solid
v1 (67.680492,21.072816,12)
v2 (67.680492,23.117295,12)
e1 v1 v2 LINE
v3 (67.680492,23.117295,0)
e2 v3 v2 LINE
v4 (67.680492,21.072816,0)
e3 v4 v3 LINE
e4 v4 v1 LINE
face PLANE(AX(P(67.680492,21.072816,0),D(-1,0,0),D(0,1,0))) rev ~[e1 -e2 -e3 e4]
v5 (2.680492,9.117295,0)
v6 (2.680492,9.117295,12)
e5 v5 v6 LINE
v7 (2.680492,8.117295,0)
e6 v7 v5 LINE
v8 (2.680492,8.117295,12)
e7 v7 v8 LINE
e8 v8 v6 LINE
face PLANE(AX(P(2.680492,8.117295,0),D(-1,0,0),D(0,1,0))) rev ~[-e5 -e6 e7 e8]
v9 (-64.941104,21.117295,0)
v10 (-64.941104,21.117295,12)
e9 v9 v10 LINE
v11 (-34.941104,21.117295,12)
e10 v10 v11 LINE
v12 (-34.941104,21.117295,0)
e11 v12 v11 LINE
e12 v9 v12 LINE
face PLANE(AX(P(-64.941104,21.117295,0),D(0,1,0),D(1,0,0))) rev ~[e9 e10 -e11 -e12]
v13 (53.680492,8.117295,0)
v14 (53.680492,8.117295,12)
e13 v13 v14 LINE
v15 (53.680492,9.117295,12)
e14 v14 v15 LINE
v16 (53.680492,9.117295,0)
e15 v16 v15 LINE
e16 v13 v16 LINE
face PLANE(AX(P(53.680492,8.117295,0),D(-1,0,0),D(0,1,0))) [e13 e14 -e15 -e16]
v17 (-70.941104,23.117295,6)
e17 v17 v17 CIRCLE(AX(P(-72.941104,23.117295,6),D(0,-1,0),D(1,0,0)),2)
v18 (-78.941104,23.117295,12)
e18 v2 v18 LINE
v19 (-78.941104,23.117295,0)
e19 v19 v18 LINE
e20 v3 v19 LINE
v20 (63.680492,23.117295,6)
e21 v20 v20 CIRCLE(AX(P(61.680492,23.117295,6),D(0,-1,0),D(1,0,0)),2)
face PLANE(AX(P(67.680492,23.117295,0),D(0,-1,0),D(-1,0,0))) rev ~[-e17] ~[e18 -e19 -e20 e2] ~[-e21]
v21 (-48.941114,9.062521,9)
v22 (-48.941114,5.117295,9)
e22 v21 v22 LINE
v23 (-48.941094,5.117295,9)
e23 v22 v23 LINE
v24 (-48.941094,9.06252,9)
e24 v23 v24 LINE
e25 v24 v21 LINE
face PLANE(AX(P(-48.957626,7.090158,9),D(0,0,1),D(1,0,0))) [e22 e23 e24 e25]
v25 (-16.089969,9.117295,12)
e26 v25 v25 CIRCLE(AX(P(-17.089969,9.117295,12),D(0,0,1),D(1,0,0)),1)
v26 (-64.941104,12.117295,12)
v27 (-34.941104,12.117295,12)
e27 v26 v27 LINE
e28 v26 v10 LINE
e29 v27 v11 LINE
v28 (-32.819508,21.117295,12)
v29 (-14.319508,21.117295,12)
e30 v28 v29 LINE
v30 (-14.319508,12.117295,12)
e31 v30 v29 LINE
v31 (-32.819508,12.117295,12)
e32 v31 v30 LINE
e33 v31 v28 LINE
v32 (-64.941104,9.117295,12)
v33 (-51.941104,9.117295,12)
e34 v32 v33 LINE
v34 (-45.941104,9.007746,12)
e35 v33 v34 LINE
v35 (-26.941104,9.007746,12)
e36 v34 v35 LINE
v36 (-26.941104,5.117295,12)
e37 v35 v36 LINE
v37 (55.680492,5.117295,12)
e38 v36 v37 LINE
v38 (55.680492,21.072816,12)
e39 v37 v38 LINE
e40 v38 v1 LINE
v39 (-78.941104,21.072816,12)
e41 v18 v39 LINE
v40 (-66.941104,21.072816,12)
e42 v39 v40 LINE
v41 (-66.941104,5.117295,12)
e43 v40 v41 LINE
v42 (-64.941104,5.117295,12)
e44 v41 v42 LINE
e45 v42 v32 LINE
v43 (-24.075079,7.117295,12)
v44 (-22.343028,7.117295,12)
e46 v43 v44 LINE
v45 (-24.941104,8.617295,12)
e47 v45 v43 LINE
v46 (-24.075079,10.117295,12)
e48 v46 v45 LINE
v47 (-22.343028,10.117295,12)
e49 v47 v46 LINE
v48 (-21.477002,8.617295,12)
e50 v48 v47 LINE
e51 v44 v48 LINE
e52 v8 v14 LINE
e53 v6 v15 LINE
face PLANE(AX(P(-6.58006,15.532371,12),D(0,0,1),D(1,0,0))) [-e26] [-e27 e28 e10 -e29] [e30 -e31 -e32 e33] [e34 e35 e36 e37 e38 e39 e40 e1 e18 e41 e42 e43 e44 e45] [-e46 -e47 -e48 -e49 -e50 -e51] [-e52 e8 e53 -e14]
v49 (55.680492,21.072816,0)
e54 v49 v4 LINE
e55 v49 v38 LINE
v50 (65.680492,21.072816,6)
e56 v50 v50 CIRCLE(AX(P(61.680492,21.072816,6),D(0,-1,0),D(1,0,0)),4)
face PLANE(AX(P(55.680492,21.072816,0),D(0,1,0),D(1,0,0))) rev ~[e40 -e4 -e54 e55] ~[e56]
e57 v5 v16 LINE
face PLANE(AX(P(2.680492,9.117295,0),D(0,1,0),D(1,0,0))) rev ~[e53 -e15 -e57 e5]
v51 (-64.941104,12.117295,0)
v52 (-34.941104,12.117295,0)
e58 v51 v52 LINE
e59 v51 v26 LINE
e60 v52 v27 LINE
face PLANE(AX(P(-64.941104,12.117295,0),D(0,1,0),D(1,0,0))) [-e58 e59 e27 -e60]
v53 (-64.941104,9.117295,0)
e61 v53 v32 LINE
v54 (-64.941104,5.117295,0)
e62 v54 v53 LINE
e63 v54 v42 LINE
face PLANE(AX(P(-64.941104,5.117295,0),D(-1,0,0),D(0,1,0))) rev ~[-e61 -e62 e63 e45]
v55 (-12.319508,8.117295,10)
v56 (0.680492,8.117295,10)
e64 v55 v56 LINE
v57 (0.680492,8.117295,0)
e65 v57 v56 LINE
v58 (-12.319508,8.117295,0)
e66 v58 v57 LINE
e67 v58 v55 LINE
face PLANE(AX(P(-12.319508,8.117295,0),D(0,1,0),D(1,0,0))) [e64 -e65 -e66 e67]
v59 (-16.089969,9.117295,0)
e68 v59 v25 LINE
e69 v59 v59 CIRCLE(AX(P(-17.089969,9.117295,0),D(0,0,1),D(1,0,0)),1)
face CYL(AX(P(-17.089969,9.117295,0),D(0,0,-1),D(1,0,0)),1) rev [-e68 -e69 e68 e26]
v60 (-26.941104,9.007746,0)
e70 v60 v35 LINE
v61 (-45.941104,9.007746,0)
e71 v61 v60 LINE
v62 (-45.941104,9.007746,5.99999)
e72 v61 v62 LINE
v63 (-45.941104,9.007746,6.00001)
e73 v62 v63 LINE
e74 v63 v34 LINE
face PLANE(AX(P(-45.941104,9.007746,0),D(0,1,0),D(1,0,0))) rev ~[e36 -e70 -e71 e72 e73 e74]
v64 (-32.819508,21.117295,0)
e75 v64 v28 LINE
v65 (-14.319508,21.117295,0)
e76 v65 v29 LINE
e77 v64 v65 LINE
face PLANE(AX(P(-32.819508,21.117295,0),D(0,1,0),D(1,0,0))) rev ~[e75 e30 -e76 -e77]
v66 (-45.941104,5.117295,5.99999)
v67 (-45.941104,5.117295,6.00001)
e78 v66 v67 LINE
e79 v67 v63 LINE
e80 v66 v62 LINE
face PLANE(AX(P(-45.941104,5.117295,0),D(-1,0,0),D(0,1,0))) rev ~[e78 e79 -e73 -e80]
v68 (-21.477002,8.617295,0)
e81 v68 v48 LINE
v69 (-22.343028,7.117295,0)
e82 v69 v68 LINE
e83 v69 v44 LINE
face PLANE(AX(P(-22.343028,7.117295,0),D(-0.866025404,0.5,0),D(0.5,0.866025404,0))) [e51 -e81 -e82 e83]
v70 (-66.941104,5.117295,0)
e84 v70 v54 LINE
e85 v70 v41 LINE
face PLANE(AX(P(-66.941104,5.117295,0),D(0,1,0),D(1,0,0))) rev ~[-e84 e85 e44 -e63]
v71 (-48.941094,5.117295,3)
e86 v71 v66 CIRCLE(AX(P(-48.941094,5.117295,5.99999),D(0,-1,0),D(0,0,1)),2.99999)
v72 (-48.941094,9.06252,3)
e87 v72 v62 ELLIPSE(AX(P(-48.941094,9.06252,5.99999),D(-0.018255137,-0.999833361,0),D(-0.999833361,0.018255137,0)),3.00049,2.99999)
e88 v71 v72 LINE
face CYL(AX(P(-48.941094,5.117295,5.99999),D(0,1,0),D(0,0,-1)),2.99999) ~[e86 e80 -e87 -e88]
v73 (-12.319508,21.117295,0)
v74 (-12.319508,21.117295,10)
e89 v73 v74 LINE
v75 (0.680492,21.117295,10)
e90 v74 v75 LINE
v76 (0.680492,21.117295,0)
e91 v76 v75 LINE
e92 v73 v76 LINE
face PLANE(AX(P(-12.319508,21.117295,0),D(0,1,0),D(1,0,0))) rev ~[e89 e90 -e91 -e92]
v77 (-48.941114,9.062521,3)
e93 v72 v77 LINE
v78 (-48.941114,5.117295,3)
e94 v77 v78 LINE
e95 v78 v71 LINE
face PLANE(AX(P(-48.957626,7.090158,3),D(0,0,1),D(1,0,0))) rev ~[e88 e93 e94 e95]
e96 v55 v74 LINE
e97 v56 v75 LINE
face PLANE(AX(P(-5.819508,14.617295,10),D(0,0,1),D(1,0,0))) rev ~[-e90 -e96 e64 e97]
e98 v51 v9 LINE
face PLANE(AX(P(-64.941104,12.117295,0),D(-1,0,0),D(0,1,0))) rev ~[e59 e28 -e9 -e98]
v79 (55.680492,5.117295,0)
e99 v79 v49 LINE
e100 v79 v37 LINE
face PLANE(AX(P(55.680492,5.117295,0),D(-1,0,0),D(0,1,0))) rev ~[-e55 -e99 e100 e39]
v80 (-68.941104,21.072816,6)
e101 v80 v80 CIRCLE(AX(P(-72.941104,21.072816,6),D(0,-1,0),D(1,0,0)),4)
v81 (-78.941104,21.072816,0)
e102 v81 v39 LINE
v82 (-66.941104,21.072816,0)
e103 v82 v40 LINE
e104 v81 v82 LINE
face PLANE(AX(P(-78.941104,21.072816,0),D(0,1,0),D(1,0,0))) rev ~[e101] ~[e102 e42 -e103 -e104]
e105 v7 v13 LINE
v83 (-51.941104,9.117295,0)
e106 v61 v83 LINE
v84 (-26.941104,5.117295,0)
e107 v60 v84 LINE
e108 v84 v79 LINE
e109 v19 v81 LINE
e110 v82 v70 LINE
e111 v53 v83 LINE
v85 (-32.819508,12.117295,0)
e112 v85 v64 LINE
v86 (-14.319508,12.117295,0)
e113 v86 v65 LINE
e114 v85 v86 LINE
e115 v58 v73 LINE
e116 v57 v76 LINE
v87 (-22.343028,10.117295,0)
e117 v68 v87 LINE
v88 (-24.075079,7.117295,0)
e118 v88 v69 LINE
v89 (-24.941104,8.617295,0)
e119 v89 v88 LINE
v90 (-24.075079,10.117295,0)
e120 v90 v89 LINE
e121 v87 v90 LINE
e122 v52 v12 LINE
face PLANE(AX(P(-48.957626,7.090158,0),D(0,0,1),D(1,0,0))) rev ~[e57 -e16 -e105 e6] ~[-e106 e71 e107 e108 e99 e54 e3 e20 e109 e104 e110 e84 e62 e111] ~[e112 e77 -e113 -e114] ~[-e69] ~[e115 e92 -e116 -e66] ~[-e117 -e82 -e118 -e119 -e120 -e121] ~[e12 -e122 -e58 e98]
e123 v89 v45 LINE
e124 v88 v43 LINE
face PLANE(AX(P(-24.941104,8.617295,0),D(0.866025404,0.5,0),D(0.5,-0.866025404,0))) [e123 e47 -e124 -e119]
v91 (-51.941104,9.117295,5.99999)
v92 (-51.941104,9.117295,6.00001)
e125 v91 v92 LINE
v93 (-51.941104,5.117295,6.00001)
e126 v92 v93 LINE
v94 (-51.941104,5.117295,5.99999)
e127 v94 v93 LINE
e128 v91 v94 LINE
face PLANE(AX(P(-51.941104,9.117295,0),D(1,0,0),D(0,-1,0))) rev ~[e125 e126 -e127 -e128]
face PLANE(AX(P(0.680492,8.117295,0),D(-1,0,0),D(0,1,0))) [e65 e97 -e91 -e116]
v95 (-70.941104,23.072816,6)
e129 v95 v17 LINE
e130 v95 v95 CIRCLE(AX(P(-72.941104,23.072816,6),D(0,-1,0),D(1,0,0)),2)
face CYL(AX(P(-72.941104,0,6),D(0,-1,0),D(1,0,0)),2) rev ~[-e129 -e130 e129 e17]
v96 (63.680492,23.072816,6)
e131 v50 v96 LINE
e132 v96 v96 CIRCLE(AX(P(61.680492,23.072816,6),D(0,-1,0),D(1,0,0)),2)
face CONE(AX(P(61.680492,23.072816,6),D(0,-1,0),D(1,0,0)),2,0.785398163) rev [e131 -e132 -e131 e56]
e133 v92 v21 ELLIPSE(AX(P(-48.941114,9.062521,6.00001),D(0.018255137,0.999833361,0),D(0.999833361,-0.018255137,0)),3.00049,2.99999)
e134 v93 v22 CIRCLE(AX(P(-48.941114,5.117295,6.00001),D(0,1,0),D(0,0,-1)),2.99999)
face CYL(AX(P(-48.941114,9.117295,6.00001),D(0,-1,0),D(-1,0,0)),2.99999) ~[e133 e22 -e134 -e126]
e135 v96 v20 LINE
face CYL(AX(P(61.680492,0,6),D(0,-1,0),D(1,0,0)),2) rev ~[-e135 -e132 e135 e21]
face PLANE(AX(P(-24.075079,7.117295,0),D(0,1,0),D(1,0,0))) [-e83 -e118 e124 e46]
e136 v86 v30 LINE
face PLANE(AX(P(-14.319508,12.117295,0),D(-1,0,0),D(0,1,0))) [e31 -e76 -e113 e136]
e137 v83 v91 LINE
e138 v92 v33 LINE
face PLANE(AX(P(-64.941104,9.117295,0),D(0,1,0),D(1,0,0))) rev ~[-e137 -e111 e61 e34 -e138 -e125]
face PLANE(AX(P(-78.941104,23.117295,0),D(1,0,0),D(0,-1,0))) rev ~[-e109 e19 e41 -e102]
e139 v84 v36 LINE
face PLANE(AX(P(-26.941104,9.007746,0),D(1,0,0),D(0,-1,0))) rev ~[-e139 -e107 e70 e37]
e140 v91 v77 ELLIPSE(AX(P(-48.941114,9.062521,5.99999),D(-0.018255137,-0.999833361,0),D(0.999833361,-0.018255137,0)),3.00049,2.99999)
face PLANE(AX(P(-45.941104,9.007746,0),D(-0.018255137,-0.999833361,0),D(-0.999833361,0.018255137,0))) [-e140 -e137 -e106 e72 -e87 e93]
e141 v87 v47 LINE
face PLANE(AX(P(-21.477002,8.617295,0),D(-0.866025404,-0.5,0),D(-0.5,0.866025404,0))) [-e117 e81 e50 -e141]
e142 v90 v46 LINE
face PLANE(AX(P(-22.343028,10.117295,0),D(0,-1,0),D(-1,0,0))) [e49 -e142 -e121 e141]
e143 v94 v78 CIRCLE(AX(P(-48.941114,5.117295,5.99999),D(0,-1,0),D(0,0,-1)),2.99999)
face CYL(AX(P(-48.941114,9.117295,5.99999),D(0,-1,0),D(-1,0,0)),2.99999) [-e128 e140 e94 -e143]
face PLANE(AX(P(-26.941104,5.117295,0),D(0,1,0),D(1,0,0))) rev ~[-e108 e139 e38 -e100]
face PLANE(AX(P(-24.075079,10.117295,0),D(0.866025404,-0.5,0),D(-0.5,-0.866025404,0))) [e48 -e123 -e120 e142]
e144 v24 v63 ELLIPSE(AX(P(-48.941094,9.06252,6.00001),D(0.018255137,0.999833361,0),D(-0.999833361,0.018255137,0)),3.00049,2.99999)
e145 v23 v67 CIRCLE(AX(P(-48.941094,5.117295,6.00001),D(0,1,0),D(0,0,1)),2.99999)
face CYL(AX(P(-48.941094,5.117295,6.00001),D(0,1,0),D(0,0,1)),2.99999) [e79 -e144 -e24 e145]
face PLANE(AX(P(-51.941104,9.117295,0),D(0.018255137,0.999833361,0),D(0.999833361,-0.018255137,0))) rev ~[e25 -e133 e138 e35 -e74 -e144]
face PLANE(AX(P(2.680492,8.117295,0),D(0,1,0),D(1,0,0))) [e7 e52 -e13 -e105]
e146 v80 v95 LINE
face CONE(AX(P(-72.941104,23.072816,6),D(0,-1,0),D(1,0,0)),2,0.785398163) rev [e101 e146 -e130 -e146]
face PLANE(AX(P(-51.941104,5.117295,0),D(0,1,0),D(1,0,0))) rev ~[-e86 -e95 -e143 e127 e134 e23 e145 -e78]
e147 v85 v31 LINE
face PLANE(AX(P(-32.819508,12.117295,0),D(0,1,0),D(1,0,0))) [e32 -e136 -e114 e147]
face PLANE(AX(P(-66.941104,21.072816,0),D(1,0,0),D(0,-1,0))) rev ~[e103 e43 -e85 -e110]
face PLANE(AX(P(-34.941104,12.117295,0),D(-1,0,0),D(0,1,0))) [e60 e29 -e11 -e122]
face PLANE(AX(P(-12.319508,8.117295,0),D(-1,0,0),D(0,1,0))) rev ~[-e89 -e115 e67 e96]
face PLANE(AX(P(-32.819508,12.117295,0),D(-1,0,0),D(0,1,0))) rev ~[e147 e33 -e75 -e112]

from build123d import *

# Parameters (mm, degrees)
F7_DEPTH  = 12
F3_W      = 18.5
F3_H      = 9
F5_R      = 1
F2_W      = 30
F2_H      = 9
F0_W      = 51
F0_H      = 1
F8_DEPTH  = 12
F9_DEPTH  = 9
F10_DEPTH = 3
F11_R     = 2.99999
F13_R     = 2
F12_R     = 2
F14_DEPTH = 23.9
F15_SIZE  = 2
F1_W      = 13
F1_H      = 13
F16_DEPTH = 10


# Not quite as in the source:
# - a fillet or chamfer is up to 0.001 mm smaller than in the source, because OpenCascade refuses the exact size


with BuildPart() as f7:
    # F6 (on Top) → F7 (new body)
    with BuildSketch(Plane.XY):
        Polygon((58.3547055721, 23.1172949925), (-78.9411039278, 23.1172949925), (-78.9411039278, 21.0728161037), (-66.9411039278, 21.0728161037), (-66.9411039278, 5.1172949925), (-64.9411039278, 5.1172949925), (-64.9411039278, 9.1172949925), (-51.9411039278, 9.1172949925), (-45.9411039278, 9.0077459167), (-26.9411039278, 9.0077459167), (-26.9411039278, 5.1172949925), (55.6804920286, 5.1172949925), (55.6804920286, 21.0728161037), (67.6804920286, 21.0728161037), (67.6804920286, 23.1172949925), align=None)
    extrude(amount=F7_DEPTH)

    # F4 (on Top) + F3 (on Top) + F5 (on Top) + F2 (on Top) + F0 (on Top) → F8 (cut)
    with BuildSketch(Plane.XY):
        Polygon((-22.3430277164, 7.1172949925), (-21.4770023127, 8.6172949925), (-22.3430277164, 10.1172949925), (-24.075078524, 10.1172949925), (-24.9411039278, 8.6172949925), (-24.075078524, 7.1172949925), align=None)
    with BuildSketch(Plane.XY):
        with Locations((-23.5695079714, 16.6172949925)):
            Rectangle(F3_W, F3_H)
    with BuildSketch(Plane.XY):
        with Locations((-17.0899687546, 9.1172949925)):
            Circle(F5_R)
    with BuildSketch(Plane.XY):
        with Locations((-49.9411039278, 16.6172949925)):
            Rectangle(F2_W, F2_H)
    with BuildSketch(Plane.XY):
        with Locations((28.1804920286, 8.6172949925)):
            Rectangle(F0_W, F0_H)
    extrude(amount=F8_DEPTH, mode=Mode.SUBTRACT)

    # F6 (on Top) → F9 (join)
    with BuildSketch(Plane.XY):
        Polygon((-51.9411039278, 9.1172949925), (-51.9411039278, 5.1172949925), (-45.9411039278, 5.1172949925), (-45.9411039278, 9.0077459167), align=None)
    extrude(amount=F9_DEPTH)

    # F6 (on Top) → F10 (cut)
    with BuildSketch(Plane.XY):
        Polygon((-51.9411039278, 9.1172949925), (-51.9411039278, 5.1172949925), (-45.9411039278, 5.1172949925), (-45.9411039278, 9.0077459167), align=None)
    extrude(amount=F10_DEPTH, mode=Mode.SUBTRACT)

    # F11 (radius 3 in the source; OpenCascade refuses exactly that, so slightly less here)
    f11_edges = [f7.edges().sort_by_distance(p)[0] for p in [
        (-51.941104, 7.117295, 9),
        (-45.941104, 7.06252, 9),
        (-51.941104, 7.117295, 3),
        (-45.941104, 7.06252, 3),
    ]]
    fillet(f11_edges, radius=F11_R)

    # F13 (on Front) + F12 (on Front) → F14 (cut)
    with BuildSketch(Plane.XZ):
        with Locations((-72.9411039278, 6)):
            Circle(F13_R)
    with BuildSketch(Plane.XZ):
        with Locations((61.6804920286, 6)):
            Circle(F12_R)
    extrude(amount=-F14_DEPTH, mode=Mode.SUBTRACT)

    # F15
    f15_edges = [f7.edges().sort_by_distance(p)[0] for p in [
        (-74.941104, 21.072816, 6),
        (59.680492, 21.072816, 6),
    ]]
    chamfer(f15_edges, length=F15_SIZE)

    # F1 (on Top) → F16 (cut)
    with BuildSketch(Plane.XY):
        with Locations((-5.8195079714, 14.6172949925)):
            Rectangle(F1_W, F1_H)
    extrude(amount=F16_DEPTH, mode=Mode.SUBTRACT)


solid = f7.part
